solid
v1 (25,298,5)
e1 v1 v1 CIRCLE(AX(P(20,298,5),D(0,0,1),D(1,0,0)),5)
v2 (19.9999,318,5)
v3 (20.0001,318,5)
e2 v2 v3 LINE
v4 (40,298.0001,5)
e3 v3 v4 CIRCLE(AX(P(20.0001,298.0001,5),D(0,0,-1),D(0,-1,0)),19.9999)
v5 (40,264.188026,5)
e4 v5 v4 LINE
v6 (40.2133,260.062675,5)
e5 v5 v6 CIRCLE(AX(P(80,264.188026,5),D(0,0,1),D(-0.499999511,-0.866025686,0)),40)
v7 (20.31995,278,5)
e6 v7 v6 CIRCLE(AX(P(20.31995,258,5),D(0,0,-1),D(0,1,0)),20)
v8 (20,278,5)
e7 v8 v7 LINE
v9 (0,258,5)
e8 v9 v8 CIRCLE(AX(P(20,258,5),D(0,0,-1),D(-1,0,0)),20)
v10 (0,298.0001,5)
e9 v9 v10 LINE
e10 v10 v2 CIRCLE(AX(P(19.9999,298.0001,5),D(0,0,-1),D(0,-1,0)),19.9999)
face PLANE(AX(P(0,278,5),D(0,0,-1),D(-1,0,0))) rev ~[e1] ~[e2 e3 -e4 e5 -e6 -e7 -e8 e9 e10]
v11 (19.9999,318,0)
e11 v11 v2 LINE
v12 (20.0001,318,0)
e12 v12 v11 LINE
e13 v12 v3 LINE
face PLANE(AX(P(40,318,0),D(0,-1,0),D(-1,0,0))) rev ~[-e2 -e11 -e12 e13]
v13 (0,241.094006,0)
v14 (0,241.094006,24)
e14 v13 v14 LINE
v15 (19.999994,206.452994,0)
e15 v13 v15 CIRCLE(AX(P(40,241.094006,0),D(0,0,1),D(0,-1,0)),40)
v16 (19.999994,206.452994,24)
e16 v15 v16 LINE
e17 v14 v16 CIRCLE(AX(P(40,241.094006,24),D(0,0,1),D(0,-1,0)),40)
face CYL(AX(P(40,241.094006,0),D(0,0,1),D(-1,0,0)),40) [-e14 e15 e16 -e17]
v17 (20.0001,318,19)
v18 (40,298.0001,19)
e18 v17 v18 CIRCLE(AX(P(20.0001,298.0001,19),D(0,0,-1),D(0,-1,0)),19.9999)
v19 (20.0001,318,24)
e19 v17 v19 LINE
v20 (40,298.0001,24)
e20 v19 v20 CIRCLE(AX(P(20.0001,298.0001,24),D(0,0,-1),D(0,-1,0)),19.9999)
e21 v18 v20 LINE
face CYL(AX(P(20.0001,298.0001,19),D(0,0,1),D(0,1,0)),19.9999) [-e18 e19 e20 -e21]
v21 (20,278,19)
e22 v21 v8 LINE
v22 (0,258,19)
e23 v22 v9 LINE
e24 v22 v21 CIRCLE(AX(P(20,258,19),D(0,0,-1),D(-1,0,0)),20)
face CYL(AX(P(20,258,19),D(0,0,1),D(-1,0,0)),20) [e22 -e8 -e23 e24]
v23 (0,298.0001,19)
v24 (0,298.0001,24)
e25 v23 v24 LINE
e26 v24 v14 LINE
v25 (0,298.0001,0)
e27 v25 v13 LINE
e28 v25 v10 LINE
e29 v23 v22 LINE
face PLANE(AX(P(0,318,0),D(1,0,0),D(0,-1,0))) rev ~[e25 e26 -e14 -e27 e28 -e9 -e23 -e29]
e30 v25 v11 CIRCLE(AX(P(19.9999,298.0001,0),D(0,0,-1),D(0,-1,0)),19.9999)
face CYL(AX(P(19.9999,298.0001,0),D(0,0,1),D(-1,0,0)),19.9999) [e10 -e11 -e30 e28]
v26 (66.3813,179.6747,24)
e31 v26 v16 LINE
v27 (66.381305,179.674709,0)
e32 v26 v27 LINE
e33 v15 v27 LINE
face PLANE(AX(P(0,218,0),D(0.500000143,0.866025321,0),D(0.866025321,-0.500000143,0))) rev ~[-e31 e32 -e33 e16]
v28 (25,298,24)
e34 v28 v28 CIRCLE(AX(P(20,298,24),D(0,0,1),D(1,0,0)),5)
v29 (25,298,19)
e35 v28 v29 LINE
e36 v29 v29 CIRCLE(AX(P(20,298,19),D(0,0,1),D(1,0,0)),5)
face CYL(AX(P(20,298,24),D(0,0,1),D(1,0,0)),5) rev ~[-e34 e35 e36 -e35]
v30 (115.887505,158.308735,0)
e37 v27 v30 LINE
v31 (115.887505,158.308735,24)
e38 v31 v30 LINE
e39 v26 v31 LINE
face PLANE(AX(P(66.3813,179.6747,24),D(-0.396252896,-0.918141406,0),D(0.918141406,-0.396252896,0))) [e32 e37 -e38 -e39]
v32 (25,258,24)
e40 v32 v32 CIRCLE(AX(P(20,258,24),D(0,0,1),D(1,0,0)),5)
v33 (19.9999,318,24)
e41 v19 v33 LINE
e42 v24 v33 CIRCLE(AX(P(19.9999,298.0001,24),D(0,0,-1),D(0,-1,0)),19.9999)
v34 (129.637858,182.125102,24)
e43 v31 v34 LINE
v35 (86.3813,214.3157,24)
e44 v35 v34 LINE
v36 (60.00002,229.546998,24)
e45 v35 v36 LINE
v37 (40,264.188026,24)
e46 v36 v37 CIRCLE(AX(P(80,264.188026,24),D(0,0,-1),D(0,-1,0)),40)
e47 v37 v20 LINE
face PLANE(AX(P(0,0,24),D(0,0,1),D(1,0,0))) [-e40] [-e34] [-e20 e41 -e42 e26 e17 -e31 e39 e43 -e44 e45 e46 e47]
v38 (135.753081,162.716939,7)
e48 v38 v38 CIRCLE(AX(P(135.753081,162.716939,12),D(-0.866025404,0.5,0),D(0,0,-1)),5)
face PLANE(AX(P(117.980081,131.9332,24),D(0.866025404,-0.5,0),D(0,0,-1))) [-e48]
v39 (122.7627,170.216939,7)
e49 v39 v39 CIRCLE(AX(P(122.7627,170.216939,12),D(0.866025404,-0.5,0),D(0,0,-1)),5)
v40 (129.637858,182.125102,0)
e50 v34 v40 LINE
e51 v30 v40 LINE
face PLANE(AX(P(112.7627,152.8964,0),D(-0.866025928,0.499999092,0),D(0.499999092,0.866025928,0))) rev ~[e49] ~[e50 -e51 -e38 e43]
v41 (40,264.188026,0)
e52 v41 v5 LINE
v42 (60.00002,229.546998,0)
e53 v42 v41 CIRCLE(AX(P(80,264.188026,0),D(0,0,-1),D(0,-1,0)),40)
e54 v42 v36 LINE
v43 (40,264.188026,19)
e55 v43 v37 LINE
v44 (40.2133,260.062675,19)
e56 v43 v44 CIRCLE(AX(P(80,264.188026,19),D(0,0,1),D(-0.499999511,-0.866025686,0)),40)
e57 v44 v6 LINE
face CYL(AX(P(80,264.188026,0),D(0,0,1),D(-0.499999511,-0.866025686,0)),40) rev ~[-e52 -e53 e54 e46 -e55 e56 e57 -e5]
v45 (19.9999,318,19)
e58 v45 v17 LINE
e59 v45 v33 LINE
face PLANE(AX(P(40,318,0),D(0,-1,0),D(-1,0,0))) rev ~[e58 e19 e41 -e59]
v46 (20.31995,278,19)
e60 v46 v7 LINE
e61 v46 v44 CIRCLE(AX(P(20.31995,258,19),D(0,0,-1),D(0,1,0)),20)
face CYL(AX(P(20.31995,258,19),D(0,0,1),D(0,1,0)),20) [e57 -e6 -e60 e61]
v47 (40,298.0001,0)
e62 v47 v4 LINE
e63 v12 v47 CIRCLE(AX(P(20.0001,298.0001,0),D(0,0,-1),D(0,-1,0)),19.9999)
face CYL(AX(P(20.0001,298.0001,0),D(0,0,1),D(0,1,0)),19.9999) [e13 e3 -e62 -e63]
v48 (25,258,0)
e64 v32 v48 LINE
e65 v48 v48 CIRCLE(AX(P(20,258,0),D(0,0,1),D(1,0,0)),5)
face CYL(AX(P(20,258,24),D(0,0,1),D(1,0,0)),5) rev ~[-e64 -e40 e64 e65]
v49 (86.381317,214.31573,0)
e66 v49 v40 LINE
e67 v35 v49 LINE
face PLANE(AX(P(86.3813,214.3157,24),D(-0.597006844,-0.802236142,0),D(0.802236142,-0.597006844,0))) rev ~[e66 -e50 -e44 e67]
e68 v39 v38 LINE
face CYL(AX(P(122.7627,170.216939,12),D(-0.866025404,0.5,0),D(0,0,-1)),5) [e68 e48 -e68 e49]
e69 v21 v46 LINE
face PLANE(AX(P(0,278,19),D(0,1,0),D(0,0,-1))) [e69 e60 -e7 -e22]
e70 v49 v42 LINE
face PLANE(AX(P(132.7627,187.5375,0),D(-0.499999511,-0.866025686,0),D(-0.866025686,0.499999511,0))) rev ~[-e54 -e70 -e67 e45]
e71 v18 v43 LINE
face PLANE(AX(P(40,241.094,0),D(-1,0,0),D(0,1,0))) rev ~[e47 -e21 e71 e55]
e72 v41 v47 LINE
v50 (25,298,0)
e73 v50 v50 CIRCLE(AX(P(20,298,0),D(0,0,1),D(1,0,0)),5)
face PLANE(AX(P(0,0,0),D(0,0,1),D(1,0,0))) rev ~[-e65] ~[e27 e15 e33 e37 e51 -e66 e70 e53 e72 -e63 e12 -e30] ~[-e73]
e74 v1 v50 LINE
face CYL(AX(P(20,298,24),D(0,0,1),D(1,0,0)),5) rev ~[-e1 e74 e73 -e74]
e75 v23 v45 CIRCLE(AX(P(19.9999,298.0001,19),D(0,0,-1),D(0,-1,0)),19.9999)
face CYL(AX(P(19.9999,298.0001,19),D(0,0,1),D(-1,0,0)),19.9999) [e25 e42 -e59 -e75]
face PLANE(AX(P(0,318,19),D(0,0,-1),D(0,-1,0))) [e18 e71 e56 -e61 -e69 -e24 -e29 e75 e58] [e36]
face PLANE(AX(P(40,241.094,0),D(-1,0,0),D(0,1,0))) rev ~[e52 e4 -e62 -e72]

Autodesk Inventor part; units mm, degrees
ref_plane "YZ Plane" through (0, 0, 0) normal (1, 0, 0) x (0, 1, 0)
ref_plane "XZ Plane" through (0, 0, 0) normal (0, 1, 0) x (-1, 0, 0)
ref_plane "XY Plane" through (0, 0, 0) normal (0, 0, 1) x (1, 0, 0)
sketch "スケッチ1" plane through (0, 0, 0) normal (0, 0, 1) x (1, 0, 0)
  line L0 (0, 0) -> (40, 0)
  line L1 (40, 0) -> (40, 318)
  line L2 (40, 318) -> (0, 318)
  line L3 (0, 318) -> (0, 0)
  line L4 (0, 218) -> (112.7627, 152.8964)
  line L5 (112.7627, 152.8964) -> (132.7627, 187.5375)
  line L6 (132.7627, 187.5375) -> (40, 241.094)
  point P0 (40, 218)
  point P1 (40, 194.906)
  point P2 (20, 318)
  point P3 (122.7627, 170.2169)
  dimension "d0" = 40
  dimension "d1" = 318
  dimension "d69" = 40
  dimension "d70" = 60
  dimension "d91" = 20
  dimension "d92" = 100
  dimension "d93" = 180
extrude "押し出し1" add sketch "スケッチ1" along normal blind 24 contours L3 L2 L1 L4 | L1 L6 L5 L4
sketch "スケッチ6" plane through (0, 0, 24) normal (0, 0, 1) x (1, 0, 0)
  circle A0 centre (20, 258) radius 5
  line L0 (40, 318) -> (0, 318) projected
  line L1 (40, 241.094) -> (40, 318) projected
  circle A1 centre (20, 20) radius 1.2295
  circle A2 centre (20, 10) radius 1.2295
  line L2 (0, 0) -> (40, 0) projected
  circle A3 centre (20, 298) radius 5
  point P0 (20, 318)
  point P1 (40, 190.8114)
  point P2 (30, 0)
  dimension "d42" = 10
  dimension "d44" = 20
  dimension "d45" = 2.459
  dimension "d46" = 2.459
  dimension "d47" = 10
  dimension "d48" = 10
  dimension "d49" = 20
  dimension "d50" = 20
  dimension "d53" = 10
  dimension "d54" = 20
  dimension "d55" = 40
  dimension "d56" = 20
extrude "押し出し4" cut sketch "スケッチ6" against normal through all
sketch "スケッチ8" plane through (0, 0, 0) normal (-1, 0, 0) x (0, 0, 1)
  line L0 (0, 318) -> (24, 318) projected
  line L1 (5, 318) -> (19, 318)
  line L2 (19, 318) -> (19, 278)
  line L3 (19, 278) -> (5, 278)
  line L4 (5, 278) -> (5, 318)
  line L5 (0, 318) -> (0, 0) projected
  dimension "d57" = 5
  dimension "d58" = 14
  dimension "d59" = 40
extrude "押し出し5" cut sketch "スケッチ8" against normal through all
fillet "フィレット1" radius 20 4 edges at (40, 318, 21.5) (40, 318, 2.5) (0, 318, 2.5) (0, 318, 21.5)
fillet "フィレット2" radius 40 2 edges at (0, 218, 12) (40, 241.094, 12)
sketch "スケッチ9" plane through (0, 0, 24) normal (0, 0, 1) x (1, 0, 0)
  line L0 (20, 206.453) -> (112.7627, 152.8964) projected
  line L1 (132.7627, 187.5375) -> (60, 229.547) projected
  line L2 (112.7627, 152.8964) -> (132.7627, 187.5375) projected
  line L3 (132.7627, 187.5375) -> (112.7627, 152.8964)
  line L4 (66.3813, 179.6747) -> (112.7627, 152.8964)
  line L5 (132.7627, 187.5375) -> (166.773, 167.9016)
  line L6 (115.1204, 126.9801) -> (133.5174, 158.8446)
  line L7 (141.7531, 173.1092) -> (128.7627, 180.6092)
  line L8 (112.7627, 152.8964) -> (20, 206.453)
  line L9 (132.7627, 187.5375) -> (60, 229.547)
  line L10 (115.1204, 126.9801) -> (125.7531, 145.3964)
  line L11 (133.5174, 158.8446) -> (145.7531, 180.0375)
  line L12 (116.7627, 159.8246) -> (129.7531, 152.3246)
  line L13 (66.3813, 179.6747) -> (129.7531, 152.3246)
  line L14 (66.3813, 179.6747) -> (86.3813, 214.3157)
  line L15 (86.3813, 214.3157) -> (141.7531, 173.1092)
  point P0 (0, 0)
  point P1 (254.4532, 80.329)
  point P2 (128.7627, 180.6092)
  point P3 (123.2579, 156.0746)
  point P4 (86.3813, 214.3157)
  point P5 (40, 194.906)
  point P6 (115.8875, 158.3088)
  point P7 (129.6379, 182.1251)
  dimension "d80" = 24
  dimension "d81" = 40
  dimension "d83" = 15
  dimension "d84" = 8
  dimension "d90" = 24
extrude "押し出し6" cut sketch "スケッチ9" against normal through all contours L13 L2 L0 | L1 L2 L15
sketch "スケッチ11" plane through (104.9897, 139.4332, 24) normal (0.8660254, -0.5, 0) x (0, 0, -1)
  line L0 (0, 21.7957) -> (0, 49.2964) projected
  line L1 (24, 21.7957) -> (24, 49.2964) projected
  line L2 (0, 24) -> (24, 24)
  line L3 (24, 24) -> (24, 0)
  line L4 (24, 0) -> (0, 0)
  line L5 (0, 0) -> (0, 24)
  line L6 (17, 17) -> (7, 17)
  line L7 (7, 17) -> (7, 7)
  line L8 (7, 7) -> (17, 7)
  line L9 (17, 7) -> (17, 17)
  line L10 (0, 35.546) -> (24, 35.546) projected
  circle A0 centre (12, 35.546) radius 5
  point P0 (24, -173.2475)
  point P1 (24, 24)
  point P2 (0, 15.546)
  point P3 (0, 55.546)
  point P4 (24, 15.546)
  point P5 (24, 55.546)
  dimension "d85" = 10
  dimension "d88" = 10
extrude "押し出し7" add sketch "スケッチ11" along normal blind 15 contours A0 L10 | L10 A0
fillet "フィレット4" radius 20 2 edges at (0, 278, 12) (40, 278, 12)
equation "\"d45\" = d46"
equation "\"d48\" = d47"
equation "\"d50\" = d49"
properties part number "legparts_06(six)"
